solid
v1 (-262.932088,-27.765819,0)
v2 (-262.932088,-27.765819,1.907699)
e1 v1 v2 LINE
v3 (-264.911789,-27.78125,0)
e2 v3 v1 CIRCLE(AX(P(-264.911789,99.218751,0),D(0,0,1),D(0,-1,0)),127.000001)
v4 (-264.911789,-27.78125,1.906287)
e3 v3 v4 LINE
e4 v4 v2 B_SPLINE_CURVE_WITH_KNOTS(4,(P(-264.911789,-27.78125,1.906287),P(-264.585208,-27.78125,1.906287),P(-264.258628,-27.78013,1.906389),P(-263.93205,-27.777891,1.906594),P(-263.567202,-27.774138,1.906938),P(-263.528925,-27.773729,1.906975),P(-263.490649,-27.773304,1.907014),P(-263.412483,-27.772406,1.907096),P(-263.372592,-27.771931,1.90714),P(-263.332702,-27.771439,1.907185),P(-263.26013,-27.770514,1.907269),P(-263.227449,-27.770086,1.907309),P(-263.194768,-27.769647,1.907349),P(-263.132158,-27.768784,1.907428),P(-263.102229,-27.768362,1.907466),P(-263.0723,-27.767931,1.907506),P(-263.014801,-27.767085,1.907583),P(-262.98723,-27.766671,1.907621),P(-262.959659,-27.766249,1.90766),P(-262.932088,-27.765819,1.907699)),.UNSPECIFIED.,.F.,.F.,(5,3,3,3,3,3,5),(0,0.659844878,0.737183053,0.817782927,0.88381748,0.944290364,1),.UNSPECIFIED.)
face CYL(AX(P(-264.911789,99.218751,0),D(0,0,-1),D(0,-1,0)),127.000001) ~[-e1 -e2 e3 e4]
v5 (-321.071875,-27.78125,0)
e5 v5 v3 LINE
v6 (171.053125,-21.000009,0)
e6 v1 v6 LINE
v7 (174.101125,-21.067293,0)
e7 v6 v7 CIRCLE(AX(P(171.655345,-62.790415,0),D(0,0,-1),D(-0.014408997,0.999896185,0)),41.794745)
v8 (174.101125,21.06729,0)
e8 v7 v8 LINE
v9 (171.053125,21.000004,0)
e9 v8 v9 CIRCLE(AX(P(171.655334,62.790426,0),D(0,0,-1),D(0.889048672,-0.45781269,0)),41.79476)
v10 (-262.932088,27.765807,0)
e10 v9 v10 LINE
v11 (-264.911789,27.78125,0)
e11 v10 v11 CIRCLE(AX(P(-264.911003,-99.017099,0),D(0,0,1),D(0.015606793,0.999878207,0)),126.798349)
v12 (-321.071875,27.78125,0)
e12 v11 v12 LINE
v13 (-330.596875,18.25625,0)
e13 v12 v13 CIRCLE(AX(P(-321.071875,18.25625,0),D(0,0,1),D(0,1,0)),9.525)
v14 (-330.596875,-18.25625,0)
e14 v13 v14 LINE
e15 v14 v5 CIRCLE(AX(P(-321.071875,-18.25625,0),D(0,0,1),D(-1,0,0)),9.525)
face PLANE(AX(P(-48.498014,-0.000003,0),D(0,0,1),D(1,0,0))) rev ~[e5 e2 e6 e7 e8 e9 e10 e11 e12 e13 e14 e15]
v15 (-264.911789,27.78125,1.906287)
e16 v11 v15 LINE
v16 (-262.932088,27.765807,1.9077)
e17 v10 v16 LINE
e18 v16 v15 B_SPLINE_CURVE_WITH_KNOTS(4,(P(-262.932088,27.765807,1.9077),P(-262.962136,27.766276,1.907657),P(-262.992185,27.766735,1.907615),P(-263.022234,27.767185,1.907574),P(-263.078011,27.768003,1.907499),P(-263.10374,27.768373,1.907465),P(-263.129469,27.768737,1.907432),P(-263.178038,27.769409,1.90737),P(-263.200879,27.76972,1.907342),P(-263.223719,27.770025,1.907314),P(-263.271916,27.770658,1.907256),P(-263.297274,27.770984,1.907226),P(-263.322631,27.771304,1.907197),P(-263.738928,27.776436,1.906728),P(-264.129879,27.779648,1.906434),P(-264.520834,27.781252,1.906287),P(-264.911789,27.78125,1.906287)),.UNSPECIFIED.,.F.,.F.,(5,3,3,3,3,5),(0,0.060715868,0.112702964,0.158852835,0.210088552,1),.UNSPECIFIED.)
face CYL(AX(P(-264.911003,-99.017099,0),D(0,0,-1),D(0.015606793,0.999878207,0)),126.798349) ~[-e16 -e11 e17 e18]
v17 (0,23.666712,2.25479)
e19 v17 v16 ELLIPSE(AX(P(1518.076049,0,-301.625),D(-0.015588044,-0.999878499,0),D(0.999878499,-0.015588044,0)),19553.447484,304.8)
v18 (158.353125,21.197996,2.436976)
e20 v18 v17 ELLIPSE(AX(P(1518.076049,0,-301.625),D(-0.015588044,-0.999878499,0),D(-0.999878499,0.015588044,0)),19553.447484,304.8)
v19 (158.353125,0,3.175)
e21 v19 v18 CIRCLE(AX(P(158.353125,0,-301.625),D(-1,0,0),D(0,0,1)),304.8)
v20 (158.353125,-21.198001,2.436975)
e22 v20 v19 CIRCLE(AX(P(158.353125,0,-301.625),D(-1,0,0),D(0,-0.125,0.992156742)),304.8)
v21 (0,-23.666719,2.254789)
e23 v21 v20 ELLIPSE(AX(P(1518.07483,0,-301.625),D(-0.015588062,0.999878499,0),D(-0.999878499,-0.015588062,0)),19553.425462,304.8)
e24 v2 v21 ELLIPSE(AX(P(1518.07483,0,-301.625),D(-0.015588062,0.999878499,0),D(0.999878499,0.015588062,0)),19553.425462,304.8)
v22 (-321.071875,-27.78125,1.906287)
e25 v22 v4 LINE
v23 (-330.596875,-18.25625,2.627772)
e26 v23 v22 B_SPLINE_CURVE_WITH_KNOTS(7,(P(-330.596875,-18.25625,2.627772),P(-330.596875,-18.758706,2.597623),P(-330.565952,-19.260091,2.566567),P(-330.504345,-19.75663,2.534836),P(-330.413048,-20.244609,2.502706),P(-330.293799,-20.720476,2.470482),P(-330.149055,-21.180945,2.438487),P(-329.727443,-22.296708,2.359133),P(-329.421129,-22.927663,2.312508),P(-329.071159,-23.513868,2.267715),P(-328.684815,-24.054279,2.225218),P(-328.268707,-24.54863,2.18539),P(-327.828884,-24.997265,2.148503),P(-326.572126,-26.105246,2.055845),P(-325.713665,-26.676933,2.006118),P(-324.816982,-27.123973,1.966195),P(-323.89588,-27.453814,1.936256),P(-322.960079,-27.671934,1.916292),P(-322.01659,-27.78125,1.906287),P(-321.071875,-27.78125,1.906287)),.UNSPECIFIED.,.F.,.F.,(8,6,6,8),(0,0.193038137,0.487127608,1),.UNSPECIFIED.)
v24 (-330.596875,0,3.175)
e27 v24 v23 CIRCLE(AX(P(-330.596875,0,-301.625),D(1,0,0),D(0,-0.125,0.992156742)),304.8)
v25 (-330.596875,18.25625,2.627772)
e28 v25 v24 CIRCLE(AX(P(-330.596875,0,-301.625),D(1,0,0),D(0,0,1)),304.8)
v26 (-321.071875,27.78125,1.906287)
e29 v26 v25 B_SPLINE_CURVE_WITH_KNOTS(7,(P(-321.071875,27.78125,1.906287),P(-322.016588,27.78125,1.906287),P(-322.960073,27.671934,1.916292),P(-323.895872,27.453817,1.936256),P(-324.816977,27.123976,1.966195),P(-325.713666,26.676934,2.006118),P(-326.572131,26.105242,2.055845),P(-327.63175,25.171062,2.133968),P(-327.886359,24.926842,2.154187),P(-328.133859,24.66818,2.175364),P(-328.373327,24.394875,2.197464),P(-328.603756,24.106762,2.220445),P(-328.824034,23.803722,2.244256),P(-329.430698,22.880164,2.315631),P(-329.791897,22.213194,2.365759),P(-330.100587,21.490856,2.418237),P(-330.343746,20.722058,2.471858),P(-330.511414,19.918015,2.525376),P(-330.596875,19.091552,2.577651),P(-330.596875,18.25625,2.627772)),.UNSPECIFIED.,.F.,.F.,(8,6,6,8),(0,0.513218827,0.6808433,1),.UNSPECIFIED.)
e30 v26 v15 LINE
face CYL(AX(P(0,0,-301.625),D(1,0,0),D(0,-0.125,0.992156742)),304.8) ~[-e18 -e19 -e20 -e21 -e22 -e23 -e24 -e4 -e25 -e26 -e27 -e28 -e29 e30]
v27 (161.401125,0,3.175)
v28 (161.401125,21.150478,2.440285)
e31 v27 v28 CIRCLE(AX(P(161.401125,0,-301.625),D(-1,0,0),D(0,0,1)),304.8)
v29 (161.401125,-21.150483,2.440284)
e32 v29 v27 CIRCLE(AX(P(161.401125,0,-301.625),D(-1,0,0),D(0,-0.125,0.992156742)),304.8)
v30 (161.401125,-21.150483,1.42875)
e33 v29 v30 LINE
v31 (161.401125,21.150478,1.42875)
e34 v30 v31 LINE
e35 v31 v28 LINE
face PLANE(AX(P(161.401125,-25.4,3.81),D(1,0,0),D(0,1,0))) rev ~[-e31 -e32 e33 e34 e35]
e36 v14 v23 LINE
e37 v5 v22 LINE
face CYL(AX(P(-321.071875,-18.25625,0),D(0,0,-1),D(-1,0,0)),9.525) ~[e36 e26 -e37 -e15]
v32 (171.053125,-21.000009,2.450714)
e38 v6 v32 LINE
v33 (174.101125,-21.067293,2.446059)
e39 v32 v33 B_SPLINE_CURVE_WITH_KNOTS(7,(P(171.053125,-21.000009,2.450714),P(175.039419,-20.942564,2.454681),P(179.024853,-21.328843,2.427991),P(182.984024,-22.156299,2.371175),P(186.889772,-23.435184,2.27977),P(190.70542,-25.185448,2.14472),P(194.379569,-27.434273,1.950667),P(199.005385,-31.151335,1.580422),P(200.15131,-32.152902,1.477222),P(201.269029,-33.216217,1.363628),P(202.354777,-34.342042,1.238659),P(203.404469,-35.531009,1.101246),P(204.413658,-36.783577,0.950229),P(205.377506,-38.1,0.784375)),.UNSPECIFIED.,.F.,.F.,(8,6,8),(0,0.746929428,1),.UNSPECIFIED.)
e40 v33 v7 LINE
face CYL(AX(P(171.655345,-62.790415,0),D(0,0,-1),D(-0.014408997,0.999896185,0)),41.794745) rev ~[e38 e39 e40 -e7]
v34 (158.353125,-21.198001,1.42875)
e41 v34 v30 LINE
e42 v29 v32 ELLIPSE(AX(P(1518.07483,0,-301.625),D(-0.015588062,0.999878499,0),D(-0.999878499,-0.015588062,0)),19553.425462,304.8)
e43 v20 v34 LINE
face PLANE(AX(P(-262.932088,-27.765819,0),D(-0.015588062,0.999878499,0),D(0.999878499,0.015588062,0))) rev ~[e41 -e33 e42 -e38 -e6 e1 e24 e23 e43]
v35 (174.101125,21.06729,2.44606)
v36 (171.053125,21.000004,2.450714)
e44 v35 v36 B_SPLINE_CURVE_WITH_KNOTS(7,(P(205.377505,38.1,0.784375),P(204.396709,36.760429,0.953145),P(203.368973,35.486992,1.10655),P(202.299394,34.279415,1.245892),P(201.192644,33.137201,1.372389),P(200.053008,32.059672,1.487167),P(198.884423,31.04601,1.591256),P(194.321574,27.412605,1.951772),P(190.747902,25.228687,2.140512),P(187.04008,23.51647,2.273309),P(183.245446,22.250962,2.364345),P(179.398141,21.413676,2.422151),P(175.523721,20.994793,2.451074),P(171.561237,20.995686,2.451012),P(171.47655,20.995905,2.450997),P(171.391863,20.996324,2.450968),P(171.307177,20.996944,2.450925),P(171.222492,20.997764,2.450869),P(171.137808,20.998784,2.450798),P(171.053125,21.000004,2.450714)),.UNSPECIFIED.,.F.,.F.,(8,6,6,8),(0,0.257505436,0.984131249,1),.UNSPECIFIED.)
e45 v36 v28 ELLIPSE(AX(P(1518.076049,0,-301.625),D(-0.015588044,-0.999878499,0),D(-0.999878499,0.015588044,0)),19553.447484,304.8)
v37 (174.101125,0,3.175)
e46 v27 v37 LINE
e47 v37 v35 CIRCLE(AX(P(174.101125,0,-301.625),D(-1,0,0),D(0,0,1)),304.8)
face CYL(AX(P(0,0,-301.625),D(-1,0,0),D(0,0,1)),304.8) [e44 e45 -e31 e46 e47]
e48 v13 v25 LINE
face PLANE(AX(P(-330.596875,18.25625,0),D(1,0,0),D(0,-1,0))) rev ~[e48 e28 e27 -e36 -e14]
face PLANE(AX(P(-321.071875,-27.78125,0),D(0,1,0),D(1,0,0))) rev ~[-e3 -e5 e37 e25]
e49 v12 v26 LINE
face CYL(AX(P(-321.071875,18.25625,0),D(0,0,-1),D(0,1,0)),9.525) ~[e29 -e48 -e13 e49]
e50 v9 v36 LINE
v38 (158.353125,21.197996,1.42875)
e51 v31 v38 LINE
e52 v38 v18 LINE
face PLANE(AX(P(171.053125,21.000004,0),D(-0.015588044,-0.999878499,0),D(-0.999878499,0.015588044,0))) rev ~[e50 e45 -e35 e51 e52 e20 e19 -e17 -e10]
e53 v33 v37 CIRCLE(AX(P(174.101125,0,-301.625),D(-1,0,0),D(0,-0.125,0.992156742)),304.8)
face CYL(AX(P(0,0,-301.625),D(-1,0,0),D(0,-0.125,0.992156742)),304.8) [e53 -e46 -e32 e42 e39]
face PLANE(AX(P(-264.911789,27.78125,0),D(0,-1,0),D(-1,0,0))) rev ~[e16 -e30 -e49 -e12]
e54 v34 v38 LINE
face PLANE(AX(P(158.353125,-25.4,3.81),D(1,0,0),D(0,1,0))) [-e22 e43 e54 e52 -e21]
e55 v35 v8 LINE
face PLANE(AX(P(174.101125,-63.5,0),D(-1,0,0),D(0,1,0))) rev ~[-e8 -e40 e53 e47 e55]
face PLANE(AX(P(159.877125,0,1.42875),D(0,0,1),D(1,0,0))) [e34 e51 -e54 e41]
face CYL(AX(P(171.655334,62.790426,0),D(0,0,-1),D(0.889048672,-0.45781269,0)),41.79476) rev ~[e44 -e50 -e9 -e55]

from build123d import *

# Parameters (mm, degrees)
F2_DEPTH      = 3.81
F3_W          = 3.048
F3_H          = 50.8
F4_DEPTH      = 2.38125
F6_DEPTH      = 330.597875
F6_DEPTH_BACK = 208.8139096404
F7_W          = 63.5
F7_H          = 127
F8_DEPTH      = 3.8110001


# Not quite as in the source:
# - ends of sketch curves that miss each other by under 0.0002 mm in the source are joined


with BuildPart() as f2:
    # F1 (on Top) → F2 (new body)
    with BuildSketch(Plane.XY):
        with BuildLine():
            Line((-321.071875, -27.78125), (-264.9117892, -27.78125))
            ThreePointArc((-264.9117892, -27.78125), (-263.9219083354, -27.7773922086), (-262.9320876087, -27.7658190689))
            Line((-262.9320876087, -27.7658190689), (171.053125, -21.0000088))
            ThreePointArc((171.053125, -21.0000088), (193.158824833, -26.9518731046), (208.8129096404, -43.6562539958))
            Line((208.8129096404, -43.6562539958), (208.8129096404, 43.6562539958))
            ThreePointArc((208.8129096404, 43.6562539958), (193.158824833, 26.9518731046), (171.053124933, 21.0000041509))
            Line((171.053124933, 21.0000041509), (-262.9320878, 27.7658068))
            ThreePointArc((-262.9320878, 27.7658068), (-263.9219083354, 27.7773922086), (-264.9117892, 27.78125))
            Line((-264.9117892, 27.78125), (-321.071875, 27.78125))
            ThreePointArc((-321.071875, 27.78125), (-327.8070670908, 24.9914420908), (-330.596875, 18.25625))
            Line((-330.596875, 18.25625), (-330.596875, -18.25625))
            ThreePointArc((-330.596875, -18.25625), (-327.8070670908, -24.9914420908), (-321.071875, -27.78125))
        make_face()
    extrude(amount=F2_DEPTH)

    # F3 (on face) → F4 (cut)
    with BuildSketch(Plane.XY.offset(3.81)):
        with Locations((159.877125, 0)):
            Rectangle(F3_W, F3_H)
    extrude(amount=-F4_DEPTH, mode=Mode.SUBTRACT)

    # F5 (on Right) → F6 (cut, two sides)
    with BuildSketch(Plane.YZ) as f6_sk:
        with BuildLine():
            Line((38.1, 15.875), (0, 15.875))
            Line((0, 15.875), (-38.1, 15.875))
            Line((-38.1, 15.875), (-38.1, 0.7843748547))
            ThreePointArc((-38.1, 0.7843748547), (-19.0874637432, 2.5767566153), (0, 3.175))
            ThreePointArc((0, 3.175), (19.0874637432, 2.5767566153), (38.1, 0.7843748547))
            Line((38.1, 0.7843748547), (38.1, 15.875))
        make_face()
    extrude(amount=-F6_DEPTH, mode=Mode.SUBTRACT)
    extrude(f6_sk.sketch, amount=F6_DEPTH_BACK, mode=Mode.SUBTRACT)

    # F7 (on Top) → F8 (cut, through all)
    with BuildSketch(Plane.XY):
        with Locations((205.851125, 0)):
            Rectangle(F7_W, F7_H)
    extrude(amount=F8_DEPTH, mode=Mode.SUBTRACT)


solid = f2.part
